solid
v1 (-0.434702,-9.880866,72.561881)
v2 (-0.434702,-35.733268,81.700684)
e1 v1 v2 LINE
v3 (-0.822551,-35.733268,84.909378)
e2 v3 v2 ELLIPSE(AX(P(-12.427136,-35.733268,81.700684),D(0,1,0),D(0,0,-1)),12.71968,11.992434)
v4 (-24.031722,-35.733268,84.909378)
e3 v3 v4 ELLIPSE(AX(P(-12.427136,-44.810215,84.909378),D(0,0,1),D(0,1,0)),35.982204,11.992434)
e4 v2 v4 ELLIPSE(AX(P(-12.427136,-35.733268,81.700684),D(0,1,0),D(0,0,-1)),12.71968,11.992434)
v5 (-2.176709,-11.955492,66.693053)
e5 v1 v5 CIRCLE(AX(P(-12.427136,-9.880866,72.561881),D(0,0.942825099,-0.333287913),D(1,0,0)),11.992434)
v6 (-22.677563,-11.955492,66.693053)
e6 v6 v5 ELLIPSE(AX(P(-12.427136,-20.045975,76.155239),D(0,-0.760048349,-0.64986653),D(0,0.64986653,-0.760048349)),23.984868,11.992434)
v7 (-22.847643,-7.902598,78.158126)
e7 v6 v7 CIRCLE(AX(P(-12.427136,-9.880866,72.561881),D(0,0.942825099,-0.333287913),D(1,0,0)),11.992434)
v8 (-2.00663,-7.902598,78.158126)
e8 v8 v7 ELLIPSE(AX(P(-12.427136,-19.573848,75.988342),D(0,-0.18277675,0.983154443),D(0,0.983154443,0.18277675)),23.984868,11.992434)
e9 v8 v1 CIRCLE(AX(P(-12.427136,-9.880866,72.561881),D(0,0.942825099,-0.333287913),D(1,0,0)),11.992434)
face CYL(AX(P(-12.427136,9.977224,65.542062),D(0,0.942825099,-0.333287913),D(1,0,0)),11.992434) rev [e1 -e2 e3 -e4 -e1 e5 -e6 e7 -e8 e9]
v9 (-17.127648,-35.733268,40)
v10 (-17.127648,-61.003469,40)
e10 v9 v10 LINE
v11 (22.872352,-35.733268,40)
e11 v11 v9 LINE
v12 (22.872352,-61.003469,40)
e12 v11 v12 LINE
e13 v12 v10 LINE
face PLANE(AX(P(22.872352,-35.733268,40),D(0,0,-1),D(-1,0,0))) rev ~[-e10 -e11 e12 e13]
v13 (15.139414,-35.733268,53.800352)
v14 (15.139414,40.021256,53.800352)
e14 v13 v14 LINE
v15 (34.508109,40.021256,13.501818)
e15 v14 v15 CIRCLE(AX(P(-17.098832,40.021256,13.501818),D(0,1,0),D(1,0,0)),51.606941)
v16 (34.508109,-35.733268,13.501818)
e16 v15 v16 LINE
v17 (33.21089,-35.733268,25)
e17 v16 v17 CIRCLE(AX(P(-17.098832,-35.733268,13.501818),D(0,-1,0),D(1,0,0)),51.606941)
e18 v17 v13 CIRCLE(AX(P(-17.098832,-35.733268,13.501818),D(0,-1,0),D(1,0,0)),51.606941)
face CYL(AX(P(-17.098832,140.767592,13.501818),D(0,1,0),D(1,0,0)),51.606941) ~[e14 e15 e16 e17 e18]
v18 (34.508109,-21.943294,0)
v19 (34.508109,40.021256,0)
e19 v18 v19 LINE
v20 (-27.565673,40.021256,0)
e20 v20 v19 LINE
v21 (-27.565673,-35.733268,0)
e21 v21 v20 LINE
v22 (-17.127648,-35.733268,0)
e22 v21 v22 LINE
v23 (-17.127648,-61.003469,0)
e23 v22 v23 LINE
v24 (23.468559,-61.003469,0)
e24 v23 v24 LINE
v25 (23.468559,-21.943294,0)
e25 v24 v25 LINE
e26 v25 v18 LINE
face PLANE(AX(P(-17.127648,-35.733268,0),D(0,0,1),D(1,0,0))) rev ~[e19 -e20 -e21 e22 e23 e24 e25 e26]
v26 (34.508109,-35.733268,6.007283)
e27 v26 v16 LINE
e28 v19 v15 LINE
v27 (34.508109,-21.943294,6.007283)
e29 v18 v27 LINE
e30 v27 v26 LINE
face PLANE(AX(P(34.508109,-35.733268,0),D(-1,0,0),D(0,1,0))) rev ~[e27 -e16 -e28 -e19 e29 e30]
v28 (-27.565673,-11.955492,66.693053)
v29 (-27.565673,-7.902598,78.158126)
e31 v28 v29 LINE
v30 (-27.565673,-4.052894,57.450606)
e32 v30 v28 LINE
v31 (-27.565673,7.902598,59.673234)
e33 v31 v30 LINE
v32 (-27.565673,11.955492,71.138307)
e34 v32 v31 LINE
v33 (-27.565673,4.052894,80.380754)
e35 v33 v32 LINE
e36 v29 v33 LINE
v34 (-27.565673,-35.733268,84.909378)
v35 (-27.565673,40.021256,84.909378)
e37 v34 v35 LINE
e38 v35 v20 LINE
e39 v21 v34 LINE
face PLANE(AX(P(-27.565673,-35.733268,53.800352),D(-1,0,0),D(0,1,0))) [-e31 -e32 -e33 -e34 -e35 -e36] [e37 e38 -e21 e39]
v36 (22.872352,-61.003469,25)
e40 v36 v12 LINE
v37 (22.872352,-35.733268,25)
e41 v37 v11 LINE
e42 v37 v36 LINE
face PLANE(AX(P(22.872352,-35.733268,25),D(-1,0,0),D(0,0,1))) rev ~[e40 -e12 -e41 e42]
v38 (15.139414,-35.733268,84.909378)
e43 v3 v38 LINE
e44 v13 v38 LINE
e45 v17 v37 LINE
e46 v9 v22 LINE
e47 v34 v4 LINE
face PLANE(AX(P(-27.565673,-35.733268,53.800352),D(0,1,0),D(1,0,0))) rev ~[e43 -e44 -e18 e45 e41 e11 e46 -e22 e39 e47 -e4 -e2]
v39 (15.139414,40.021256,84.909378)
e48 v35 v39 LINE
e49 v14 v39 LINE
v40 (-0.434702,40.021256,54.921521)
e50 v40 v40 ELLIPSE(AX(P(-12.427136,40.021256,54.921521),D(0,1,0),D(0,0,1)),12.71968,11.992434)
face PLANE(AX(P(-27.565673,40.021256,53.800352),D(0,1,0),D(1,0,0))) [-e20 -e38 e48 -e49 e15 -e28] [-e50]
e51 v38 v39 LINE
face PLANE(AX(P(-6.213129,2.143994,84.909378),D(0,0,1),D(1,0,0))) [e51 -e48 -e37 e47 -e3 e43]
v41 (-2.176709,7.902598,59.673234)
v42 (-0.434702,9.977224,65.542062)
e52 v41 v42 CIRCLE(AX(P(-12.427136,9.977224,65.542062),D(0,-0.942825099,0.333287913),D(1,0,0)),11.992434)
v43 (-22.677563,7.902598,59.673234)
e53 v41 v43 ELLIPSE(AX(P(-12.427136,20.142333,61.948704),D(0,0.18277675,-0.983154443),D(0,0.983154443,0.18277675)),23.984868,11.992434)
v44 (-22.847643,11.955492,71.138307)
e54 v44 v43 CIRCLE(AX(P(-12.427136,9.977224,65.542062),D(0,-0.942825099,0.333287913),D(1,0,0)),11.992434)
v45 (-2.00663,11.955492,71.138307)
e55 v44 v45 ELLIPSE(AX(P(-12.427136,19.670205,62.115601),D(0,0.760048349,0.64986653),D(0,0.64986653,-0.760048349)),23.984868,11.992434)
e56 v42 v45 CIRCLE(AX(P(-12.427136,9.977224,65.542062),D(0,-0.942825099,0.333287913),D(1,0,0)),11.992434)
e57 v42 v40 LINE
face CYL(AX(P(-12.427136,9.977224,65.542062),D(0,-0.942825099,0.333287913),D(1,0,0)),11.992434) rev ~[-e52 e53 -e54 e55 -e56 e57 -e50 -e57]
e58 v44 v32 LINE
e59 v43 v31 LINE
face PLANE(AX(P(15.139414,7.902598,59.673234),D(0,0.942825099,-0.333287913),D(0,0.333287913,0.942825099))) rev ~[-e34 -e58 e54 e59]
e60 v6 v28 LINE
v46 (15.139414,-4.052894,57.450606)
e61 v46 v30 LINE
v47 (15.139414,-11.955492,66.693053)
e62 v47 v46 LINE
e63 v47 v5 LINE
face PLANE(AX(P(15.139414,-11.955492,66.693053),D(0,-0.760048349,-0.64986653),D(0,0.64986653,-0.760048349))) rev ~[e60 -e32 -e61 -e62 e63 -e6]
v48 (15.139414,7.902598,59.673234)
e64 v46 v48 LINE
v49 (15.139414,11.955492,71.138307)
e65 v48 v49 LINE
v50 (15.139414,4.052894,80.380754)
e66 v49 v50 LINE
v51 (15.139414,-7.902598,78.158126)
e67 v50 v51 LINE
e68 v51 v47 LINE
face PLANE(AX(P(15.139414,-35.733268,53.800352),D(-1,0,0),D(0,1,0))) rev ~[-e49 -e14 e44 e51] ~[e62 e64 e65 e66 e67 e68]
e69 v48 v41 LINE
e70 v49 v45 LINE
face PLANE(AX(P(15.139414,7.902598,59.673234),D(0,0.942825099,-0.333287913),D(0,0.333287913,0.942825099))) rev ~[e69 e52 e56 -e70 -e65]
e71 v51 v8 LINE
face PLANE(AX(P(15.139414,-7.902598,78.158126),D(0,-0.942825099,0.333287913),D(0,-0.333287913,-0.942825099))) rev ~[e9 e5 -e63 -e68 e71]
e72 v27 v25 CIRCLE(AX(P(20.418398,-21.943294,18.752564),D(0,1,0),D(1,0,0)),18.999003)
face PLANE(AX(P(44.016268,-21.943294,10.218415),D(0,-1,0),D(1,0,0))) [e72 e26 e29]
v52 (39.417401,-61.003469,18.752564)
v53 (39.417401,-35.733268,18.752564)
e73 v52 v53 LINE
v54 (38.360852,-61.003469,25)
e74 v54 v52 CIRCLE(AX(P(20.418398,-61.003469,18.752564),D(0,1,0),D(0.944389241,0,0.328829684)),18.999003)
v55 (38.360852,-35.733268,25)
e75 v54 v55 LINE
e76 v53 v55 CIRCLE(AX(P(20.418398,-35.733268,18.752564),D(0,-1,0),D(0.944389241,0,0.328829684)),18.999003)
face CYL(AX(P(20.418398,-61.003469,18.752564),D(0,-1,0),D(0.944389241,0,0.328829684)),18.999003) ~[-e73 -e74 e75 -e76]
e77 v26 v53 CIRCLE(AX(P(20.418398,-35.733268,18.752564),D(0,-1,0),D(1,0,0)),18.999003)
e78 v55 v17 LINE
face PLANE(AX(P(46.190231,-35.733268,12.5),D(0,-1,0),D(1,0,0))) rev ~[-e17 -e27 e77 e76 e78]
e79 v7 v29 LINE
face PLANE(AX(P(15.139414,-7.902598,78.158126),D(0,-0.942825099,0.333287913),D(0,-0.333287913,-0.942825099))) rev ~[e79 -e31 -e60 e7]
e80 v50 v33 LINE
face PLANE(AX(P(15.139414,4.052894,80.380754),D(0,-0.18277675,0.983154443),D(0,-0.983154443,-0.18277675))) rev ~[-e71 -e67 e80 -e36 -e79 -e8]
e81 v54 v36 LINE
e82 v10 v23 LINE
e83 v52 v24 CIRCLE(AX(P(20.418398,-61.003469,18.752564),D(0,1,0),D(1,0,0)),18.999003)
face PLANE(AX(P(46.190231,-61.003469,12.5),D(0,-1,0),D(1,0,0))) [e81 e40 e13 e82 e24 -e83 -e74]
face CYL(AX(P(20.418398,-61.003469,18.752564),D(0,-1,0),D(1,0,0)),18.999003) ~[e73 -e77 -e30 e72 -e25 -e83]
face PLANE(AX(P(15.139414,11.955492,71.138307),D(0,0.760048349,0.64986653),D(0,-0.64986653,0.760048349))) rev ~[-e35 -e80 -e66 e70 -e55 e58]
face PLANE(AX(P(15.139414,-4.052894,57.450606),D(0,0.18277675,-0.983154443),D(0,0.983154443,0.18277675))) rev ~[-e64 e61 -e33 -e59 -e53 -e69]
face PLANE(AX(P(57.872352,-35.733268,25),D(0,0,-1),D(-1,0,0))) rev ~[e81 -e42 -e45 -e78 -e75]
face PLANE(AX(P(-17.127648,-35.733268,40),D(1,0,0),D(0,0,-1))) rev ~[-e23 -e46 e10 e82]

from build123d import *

# Parameters (mm, degrees)
F0_W          = 62.0737820864
F0_H          = 75.7545232773
F1_DEPTH      = 53.8003519177
F2_W          = 42.7050869912
F2_H          = 75.7545232773
F3_DEPTH      = 31.1090257019
F5_DEPTH      = 50.4763200879
F6_R          = 11.9924338382
F7_DEPTH      = 57.1455173194
F7_DEPTH_BACK = 70.5328881741
F8_W          = 23.3642431419
F8_H          = 25
F9_DEPTH      = 25.2702012658
F11_DEPTH     = 39.0601754189
F12_T1_DEPTH  = 176.500859237


# Not quite as in the source:
# - a fillet or chamfer that OpenCascade refuses, or shapes differently, is made with other operations: its cross-section is extruded or revolved along the edge and cut away or added


with BuildPart() as f1:
    # F0 (on Top) → F1 (new body)
    with BuildSketch(Plane.XY):
        with Locations((3.4712180495, 2.1439939737)):
            Rectangle(F0_W, F0_H)
    extrude(amount=F1_DEPTH)

    # F2 (on face) → F3 (join)
    with BuildSketch(Plane.XY.offset(53.8003519177)):
        with Locations((-6.2131294981, 2.1439939737)):
            Rectangle(F2_W, F2_H)
    extrude(amount=F3_DEPTH)

    # F4 (on face) → F5 (cut)
    with BuildSketch(Plane.YZ.offset(15.1394139975)):
        Polygon((7.902597892, 59.6732337929), (11.9554921985, 71.1383074522), (4.0528943065, 80.3807537101), (-7.902597892, 78.1581263088), (-11.9554921985, 66.6930526495), (-4.0528943065, 57.4506063916), align=None)
    extrude(amount=-F5_DEPTH, mode=Mode.SUBTRACT)

    # F6 (on face) → F7 (cut, two sides)
    with BuildSketch(Plane(origin=(0, -11.726481381, 4.1453017256), x_dir=(1, 0, 0), z_dir=(0, -0.9428250988, 0.3332879132))) as f7_sk:
        with Locations((-12.427136302, 65.1199892163)):
            Circle(F6_R)
    extrude(amount=-F7_DEPTH, mode=Mode.SUBTRACT)
    extrude(f7_sk.sketch, amount=F7_DEPTH_BACK, mode=Mode.SUBTRACT)

    # F8 (on face) → F9 (join)
    with BuildSketch(Plane.XZ.offset(35.7332676649)):
        with Locations((46.1902306637, 12.5)):
            Rectangle(F8_W, F8_H)
        Polygon((-17.1276477654, 40), (-17.1276477654, 0), (34.5081090927, 0), (34.5081090927, 25), (22.8723522346, 25), (22.8723522346, 40), align=None)
    extrude(amount=F9_DEPTH)

    # F10 (on face) → F11 (cut)
    with BuildSketch(Plane.XZ.offset(61.0034689307)):
        with BuildLine():
            ThreePointArc((38.360852409, 25), (39.1514020631, 21.9206371156), (39.417401399, 18.7525637448))
            ThreePointArc((39.417401399, 18.7525637448), (34.8909952827, 6.443784061), (23.4685587384, 0))
            Line((23.4685587384, 0), (57.8723522346, 0))
            Line((57.8723522346, 0), (57.8723522346, 25))
            Line((57.8723522346, 25), (38.360852409, 25))
        make_face()
    extrude(amount=-F11_DEPTH, mode=Mode.SUBTRACT)

    # F12: fillet of radius 51.606941339 on 1 edges, made by hand

    # F12_s2 → F12_t1 (cut)
    with BuildSketch(Plane.XZ.offset(-140.7675915721)):
        with BuildLine():
            ThreePointArc((34.5081090927, 13.5018175338), (29.4145726879, 35.8575674831), (15.1394139975, 53.8003519177))
            Line((15.1394139975, 53.8003519177), (34.5081090927, 53.8003519177))
            Line((34.5081090927, 53.8003519177), (34.5081090927, 13.5018175338))
        make_face()
    extrude(amount=F12_T1_DEPTH, mode=Mode.SUBTRACT)


solid = f1.part
